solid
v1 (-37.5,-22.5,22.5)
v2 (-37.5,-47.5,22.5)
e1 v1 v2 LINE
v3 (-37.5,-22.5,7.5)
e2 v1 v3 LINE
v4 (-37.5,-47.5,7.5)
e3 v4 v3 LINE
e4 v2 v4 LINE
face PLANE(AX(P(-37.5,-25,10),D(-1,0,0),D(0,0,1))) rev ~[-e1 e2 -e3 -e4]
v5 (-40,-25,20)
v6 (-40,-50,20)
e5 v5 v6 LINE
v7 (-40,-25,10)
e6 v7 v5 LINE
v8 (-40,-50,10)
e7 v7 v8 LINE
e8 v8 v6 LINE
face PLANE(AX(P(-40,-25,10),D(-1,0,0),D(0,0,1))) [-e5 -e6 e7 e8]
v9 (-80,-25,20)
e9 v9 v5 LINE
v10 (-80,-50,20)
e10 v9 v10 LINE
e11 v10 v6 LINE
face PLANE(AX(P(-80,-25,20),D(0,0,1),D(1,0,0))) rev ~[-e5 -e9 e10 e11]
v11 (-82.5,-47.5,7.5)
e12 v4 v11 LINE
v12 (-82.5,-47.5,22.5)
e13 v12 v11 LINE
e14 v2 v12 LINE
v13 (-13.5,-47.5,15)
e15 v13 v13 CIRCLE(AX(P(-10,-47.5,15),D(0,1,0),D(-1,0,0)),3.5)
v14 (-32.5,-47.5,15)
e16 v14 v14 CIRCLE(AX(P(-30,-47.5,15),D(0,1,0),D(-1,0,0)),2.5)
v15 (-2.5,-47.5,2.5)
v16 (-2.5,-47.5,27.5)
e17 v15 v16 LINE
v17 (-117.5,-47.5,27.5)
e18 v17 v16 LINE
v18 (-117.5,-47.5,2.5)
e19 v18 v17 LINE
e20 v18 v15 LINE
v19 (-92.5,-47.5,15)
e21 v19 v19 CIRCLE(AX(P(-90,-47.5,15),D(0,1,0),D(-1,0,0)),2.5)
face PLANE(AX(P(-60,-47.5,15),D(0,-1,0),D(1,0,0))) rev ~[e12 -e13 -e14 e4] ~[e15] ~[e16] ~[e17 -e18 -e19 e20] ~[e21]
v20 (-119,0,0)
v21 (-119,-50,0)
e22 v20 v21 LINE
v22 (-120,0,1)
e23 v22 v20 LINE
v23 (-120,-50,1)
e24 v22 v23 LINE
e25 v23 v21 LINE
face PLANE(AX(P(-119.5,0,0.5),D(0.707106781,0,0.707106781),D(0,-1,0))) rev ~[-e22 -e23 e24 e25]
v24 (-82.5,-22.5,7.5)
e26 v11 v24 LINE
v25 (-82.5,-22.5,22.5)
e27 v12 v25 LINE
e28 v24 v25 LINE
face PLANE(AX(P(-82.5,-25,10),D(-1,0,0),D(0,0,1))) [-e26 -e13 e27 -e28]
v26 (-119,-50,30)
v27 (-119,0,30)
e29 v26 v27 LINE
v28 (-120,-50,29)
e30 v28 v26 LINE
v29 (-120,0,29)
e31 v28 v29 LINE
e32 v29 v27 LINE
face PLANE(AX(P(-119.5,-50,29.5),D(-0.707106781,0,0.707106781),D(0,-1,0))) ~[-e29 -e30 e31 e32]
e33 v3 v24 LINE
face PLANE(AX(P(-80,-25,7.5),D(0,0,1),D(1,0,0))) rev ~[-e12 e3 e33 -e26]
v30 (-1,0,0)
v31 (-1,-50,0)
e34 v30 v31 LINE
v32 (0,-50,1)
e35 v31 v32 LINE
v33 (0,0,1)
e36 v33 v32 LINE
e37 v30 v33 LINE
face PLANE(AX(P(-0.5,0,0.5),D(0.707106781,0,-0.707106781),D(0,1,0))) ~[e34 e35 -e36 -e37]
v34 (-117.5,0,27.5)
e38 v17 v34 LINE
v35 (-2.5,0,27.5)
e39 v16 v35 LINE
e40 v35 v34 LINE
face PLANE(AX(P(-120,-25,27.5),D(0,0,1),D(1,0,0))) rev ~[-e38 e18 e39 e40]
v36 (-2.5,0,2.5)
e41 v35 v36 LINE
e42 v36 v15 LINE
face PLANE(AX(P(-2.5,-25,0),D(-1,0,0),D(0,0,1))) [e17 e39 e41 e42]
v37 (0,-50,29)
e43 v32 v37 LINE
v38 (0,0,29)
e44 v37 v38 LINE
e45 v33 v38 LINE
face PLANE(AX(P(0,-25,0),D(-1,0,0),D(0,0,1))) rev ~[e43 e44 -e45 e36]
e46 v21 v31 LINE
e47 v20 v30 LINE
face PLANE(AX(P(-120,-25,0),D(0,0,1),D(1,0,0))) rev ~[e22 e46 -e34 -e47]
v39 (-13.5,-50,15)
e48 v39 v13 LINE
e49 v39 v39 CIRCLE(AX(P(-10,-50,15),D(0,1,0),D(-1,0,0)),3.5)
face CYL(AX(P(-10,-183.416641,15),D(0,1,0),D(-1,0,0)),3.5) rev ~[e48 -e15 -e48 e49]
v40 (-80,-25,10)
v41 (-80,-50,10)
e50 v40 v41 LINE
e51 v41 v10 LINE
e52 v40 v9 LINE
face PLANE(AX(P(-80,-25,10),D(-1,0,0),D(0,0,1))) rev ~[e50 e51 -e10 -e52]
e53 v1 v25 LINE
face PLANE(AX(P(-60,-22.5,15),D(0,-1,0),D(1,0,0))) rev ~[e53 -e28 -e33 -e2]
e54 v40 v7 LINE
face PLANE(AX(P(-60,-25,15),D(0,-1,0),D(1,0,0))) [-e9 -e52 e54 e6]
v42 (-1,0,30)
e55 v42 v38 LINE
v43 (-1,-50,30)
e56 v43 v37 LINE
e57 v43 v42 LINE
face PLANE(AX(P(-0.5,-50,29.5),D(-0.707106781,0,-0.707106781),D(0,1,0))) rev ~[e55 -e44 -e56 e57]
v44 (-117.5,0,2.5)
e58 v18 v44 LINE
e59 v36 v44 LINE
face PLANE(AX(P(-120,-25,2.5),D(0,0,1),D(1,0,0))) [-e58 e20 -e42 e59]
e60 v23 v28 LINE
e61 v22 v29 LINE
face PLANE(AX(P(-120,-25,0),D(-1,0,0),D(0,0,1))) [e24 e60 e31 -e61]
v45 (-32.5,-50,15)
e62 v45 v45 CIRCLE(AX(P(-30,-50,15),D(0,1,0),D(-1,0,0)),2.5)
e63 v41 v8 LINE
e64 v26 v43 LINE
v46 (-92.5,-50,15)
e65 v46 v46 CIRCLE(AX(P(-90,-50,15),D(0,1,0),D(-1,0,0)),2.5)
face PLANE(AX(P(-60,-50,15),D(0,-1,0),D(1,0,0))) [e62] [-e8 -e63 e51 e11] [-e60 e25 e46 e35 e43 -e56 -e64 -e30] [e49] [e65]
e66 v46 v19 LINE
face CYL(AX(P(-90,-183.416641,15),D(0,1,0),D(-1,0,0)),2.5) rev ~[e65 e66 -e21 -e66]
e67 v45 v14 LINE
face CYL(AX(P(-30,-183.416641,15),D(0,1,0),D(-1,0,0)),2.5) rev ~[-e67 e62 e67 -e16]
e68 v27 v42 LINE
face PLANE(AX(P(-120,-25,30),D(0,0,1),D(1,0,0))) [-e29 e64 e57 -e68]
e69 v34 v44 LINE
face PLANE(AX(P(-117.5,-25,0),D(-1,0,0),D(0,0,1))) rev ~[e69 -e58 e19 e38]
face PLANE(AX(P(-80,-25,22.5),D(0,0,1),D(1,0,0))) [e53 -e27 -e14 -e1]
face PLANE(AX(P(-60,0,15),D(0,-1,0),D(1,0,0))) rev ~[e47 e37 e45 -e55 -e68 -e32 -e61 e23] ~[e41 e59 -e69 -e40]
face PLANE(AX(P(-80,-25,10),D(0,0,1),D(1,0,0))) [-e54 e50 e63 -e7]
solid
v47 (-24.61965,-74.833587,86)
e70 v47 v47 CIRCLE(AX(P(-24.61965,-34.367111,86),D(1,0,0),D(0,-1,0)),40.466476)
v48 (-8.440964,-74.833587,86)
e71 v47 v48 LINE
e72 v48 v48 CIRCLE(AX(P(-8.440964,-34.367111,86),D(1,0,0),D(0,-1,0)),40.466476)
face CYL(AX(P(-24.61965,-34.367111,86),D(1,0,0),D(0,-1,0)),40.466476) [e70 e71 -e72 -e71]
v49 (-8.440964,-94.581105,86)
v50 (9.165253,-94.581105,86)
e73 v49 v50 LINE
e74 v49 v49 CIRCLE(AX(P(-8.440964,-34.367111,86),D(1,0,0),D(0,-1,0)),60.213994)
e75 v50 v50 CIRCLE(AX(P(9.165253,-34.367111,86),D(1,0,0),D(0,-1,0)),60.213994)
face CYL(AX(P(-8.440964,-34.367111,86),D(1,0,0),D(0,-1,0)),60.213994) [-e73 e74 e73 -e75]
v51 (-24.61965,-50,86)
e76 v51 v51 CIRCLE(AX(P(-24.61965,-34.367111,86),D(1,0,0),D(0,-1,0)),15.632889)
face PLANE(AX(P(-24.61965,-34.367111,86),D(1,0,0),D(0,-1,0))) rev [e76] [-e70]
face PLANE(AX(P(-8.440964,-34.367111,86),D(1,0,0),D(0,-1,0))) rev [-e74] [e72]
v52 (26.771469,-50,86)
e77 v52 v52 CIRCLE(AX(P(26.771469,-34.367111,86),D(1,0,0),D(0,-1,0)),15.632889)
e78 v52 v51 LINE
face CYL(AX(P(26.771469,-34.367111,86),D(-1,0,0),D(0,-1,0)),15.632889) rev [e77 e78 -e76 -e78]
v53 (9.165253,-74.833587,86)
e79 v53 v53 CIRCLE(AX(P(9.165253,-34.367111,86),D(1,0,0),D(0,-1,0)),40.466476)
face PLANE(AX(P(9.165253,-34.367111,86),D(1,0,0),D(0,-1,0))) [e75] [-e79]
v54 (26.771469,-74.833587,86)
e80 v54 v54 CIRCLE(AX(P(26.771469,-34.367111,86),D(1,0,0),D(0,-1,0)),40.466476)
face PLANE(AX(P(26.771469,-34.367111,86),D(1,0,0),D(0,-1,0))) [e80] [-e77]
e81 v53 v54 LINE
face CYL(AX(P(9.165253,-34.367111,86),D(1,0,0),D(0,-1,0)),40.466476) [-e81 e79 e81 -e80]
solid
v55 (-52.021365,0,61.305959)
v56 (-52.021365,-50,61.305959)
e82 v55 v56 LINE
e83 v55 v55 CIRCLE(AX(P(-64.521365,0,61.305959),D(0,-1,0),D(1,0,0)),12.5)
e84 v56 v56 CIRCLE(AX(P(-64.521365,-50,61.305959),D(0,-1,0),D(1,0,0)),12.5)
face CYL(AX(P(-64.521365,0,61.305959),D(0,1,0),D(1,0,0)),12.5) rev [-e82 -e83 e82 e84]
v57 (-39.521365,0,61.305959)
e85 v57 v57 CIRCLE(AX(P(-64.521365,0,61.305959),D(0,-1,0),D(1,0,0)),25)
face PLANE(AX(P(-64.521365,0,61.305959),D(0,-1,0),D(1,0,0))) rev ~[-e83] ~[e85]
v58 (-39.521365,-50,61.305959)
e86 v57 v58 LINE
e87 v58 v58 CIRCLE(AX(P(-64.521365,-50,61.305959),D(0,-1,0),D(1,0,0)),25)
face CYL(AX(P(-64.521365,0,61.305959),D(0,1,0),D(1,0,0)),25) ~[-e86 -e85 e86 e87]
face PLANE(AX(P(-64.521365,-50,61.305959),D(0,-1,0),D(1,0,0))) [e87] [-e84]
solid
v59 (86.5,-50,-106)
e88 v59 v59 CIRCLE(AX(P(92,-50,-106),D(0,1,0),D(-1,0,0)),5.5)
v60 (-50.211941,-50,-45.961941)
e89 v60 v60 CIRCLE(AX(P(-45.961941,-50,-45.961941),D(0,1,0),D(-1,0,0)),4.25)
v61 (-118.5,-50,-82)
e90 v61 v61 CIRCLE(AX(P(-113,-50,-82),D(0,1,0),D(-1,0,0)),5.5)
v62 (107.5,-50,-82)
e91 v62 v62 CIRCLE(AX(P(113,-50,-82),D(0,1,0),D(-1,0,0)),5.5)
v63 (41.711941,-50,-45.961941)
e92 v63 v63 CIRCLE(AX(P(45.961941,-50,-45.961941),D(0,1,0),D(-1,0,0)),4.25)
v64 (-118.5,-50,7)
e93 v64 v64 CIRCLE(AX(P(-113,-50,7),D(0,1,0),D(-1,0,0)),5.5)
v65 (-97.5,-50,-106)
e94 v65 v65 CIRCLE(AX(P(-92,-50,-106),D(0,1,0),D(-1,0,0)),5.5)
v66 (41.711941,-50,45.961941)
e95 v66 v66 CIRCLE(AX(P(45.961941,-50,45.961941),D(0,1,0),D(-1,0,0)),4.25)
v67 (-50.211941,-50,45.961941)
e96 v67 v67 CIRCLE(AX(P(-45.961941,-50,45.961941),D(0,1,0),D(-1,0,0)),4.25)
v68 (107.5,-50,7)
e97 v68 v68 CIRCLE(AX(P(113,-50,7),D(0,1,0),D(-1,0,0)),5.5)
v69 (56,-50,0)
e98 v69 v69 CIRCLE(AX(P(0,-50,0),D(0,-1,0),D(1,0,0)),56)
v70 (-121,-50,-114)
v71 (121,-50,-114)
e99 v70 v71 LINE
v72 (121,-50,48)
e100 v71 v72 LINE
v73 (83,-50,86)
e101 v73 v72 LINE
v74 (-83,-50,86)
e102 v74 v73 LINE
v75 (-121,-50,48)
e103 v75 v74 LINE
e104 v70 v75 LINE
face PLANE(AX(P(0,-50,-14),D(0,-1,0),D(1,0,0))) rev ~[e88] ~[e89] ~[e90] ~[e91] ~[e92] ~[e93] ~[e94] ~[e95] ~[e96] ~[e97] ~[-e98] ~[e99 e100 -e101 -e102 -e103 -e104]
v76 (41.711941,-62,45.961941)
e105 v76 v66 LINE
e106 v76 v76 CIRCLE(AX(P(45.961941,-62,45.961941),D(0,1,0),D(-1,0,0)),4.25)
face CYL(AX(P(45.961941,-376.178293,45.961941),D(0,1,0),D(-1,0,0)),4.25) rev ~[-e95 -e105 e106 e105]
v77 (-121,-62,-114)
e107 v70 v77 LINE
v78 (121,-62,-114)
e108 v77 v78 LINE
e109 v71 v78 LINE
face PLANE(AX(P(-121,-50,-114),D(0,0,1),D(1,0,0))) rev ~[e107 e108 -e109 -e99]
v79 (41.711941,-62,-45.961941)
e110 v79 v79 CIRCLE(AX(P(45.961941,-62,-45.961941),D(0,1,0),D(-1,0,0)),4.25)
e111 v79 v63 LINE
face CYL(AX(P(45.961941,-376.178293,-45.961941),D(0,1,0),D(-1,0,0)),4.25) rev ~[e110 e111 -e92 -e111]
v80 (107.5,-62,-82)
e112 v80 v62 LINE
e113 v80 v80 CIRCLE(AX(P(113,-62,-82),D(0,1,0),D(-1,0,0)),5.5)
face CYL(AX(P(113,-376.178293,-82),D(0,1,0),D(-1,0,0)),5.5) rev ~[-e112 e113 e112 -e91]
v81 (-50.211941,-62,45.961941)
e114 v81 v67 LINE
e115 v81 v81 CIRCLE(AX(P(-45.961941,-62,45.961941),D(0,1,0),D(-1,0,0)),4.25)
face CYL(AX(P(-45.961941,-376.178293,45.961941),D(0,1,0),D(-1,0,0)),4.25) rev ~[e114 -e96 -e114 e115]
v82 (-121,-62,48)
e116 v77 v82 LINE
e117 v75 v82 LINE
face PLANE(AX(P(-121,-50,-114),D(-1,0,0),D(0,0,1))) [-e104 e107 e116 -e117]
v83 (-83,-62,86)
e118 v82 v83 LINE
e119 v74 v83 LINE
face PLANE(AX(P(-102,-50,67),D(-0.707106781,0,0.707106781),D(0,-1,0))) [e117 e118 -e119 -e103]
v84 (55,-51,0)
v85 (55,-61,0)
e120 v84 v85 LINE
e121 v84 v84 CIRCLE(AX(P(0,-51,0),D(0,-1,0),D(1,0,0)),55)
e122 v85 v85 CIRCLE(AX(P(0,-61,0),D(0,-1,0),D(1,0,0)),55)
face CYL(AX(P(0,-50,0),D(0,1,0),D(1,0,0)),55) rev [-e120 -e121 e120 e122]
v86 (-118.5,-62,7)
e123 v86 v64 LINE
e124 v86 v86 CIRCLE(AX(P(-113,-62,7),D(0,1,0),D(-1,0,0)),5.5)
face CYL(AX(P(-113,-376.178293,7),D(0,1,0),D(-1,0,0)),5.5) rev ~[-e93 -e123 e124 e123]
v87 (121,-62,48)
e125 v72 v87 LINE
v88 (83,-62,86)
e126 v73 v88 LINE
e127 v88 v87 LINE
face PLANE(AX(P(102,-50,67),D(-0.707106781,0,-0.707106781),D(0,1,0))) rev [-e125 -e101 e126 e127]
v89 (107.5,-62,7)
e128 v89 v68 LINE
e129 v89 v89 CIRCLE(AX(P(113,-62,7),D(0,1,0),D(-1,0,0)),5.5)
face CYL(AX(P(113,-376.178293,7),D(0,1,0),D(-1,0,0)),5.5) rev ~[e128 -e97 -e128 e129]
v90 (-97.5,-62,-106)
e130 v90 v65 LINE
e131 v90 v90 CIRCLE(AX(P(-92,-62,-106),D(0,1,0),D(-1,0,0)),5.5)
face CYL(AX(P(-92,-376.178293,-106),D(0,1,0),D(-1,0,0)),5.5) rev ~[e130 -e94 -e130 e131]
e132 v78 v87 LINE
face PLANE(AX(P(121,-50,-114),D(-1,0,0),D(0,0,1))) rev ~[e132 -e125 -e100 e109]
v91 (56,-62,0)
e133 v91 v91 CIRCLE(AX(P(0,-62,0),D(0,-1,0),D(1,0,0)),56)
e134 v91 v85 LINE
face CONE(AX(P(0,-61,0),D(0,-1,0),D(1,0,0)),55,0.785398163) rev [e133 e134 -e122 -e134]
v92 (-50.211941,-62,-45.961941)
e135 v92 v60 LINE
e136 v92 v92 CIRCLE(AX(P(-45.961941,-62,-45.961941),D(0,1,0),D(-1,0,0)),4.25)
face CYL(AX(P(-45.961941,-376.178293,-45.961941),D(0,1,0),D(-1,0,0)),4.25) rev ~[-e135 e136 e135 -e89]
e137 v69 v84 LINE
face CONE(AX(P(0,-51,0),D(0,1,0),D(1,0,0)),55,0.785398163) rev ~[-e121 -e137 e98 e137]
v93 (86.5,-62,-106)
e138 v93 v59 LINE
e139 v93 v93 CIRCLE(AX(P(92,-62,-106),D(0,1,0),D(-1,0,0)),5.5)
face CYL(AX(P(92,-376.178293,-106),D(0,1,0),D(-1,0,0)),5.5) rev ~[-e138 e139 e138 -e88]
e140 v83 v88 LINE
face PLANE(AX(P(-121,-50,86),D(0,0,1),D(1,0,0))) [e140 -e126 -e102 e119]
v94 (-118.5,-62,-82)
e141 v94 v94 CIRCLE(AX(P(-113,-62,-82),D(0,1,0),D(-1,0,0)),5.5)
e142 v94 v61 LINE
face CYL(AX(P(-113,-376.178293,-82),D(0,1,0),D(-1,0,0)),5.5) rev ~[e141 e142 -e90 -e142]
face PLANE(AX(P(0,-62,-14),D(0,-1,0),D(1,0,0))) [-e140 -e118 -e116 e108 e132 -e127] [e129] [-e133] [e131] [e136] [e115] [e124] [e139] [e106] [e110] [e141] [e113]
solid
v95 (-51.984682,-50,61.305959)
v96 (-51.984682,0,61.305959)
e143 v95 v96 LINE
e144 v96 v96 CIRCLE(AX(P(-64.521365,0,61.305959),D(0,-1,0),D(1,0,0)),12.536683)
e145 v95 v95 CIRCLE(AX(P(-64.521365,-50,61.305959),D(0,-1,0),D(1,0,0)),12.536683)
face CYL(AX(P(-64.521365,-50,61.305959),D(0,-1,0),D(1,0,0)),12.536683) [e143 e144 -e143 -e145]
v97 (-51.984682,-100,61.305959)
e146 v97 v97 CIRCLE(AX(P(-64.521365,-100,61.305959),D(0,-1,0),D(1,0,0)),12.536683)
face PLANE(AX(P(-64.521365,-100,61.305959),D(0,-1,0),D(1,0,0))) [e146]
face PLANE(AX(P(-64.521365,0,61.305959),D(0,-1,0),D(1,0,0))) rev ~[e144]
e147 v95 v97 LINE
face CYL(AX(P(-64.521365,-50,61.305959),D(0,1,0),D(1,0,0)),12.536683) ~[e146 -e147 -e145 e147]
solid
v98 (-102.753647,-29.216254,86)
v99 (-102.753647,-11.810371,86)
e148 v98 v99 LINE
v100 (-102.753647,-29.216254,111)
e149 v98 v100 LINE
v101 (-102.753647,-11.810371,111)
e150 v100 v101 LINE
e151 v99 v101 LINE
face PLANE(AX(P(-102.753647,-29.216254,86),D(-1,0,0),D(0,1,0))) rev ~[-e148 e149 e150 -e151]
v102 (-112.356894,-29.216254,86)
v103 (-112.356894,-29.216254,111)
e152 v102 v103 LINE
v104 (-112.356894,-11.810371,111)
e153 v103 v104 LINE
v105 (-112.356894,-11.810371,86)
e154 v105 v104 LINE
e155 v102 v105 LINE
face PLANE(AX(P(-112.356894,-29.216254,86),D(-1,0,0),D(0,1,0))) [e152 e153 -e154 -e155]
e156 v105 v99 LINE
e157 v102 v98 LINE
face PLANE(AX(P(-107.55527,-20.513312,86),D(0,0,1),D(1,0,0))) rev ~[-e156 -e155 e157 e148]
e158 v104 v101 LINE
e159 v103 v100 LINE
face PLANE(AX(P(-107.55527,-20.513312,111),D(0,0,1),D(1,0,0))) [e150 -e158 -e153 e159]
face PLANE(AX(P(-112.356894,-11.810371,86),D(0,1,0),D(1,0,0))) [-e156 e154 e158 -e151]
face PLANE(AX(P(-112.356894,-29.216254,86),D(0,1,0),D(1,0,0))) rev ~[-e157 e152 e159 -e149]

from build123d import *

# Parameters (mm, degrees)
F0_W           = 120
F0_H           = 30
F1_DEPTH       = 25
F2_W           = 120
F2_H           = 30
F2_W_2         = 40
F2_H_2         = 10
F3_DEPTH       = 25
F4_T           = -2.5
F6_D           = 5
F7_D           = 7
F8_SIZE        = 1
F9_R           = 25
F9_R_2         = 12.5
F10_DEPTH      = 50
F13_R          = 12.5366828167
F14_DEPTH      = 50
F14_DEPTH_BACK = 50
F15_W          = 242
F15_H          = 200
F15_R          = 55
F16_DEPTH      = 12
F17_SIZE       = 38
F19_D          = 8.5
F21_D          = 11
F22_SIZE       = 1
F23_W          = 9.6032470465
F23_H          = 17.4058834091
F24_DEPTH      = 25


with BuildPart() as f1:
    # F0 (on Front) → F1 (new body)
    with BuildSketch(Plane.XZ):
        with Locations((-60, 15)):
            Rectangle(F0_W, F0_H)
    extrude(amount=F1_DEPTH)

    # F2 (on face) → F3 (join)
    with BuildSketch(Plane.XZ.offset(25)):
        with Locations((-60, 15)):
            Rectangle(F2_W, F2_H)
        with Locations((-60, 15)):
            Rectangle(F2_W_2, F2_H_2, mode=Mode.SUBTRACT)
    extrude(amount=F3_DEPTH)

    # F4
    f4_openings = [f1.faces().sort_by_distance(p)[0] for p in [
        (-60, 0, 15),
    ]]
    offset(amount=F4_T, openings=f4_openings, kind=Kind.INTERSECTION)

    # F6 (through all)
    with Locations(Plane.XZ.offset(50)):
        with Locations((-90, 15), (-30, 15)):
            Hole(F6_D / 2)

    # F7 (through all)
    with Locations(Plane.XZ.offset(50)):
        with Locations((-10, 15)):
            Hole(F7_D / 2)

    # F8
    f8_edges = [f1.edges().sort_by_distance(p)[0] for p in [
        (-120, -25, 30),
        (-120, -25, 0),
        (0, -25, 30),
        (0, -25, 0),
    ]]
    chamfer(f8_edges, length=F8_SIZE)


with BuildPart() as f10:
    # F9 (on Front) → F10 (new body)
    with BuildSketch(Plane.XZ):
        with Locations((-64.5213648677, 61.3059587777)):
            Circle(F9_R)
        with Locations((-64.5213648677, 61.3059587777)):
            Circle(F9_R_2, mode=Mode.SUBTRACT)
    extrude(amount=F10_DEPTH)


with BuildPart() as f14:
    # F13 (on offset) → F14 (new body, two sides)
    with BuildSketch(Plane.XZ.offset(50)) as f14_sk:
        with Locations((-64.5213648677, 61.3059587777)):
            Circle(F13_R)
    extrude(amount=-F14_DEPTH)
    extrude(f14_sk.sketch, amount=F14_DEPTH_BACK)


with BuildPart() as f16:
    # F15 (on offset) → F16 (new body)
    with BuildSketch(Plane.XZ.offset(50)):
        with Locations((0, -14)):
            Rectangle(F15_W, F15_H)
        Circle(F15_R, mode=Mode.SUBTRACT)
    extrude(amount=F16_DEPTH)

    # F17
    f17_edges = [f16.edges().sort_by_distance(p)[0] for p in [
        (-121, -56, 86),
        (121, -56, 86),
    ]]
    chamfer(f17_edges, length=F17_SIZE)

    # F19 (through all)
    with Locations(Plane.XZ.offset(62)):
        with Locations((-45.9619407771, 45.9619407771), (45.9619407771, 45.9619407771), (45.9619407771, -45.9619407771), (-45.9619407771, -45.9619407771)):
            Hole(F19_D / 2)

    # F21 (through all)
    with Locations(Plane.XZ.offset(62)):
        with Locations((-113, 7), (113, 7), (113, -82), (92, -106), (-92, -106), (-113, -82)):
            Hole(F21_D / 2)

    # F22
    f22_edges = [f16.edges().sort_by_distance(p)[0] for p in [
        (-55, -62, 0),
        (-55, -50, 0),
    ]]
    chamfer(f22_edges, length=F22_SIZE)


with BuildPart() as f24:
    # F23 (on face) → F24 (new body)
    with BuildSketch(Plane.XY.offset(86)):
        with Locations((-107.555270195, -20.5133124255)):
            Rectangle(F23_W, F23_H)
    extrude(amount=F24_DEPTH)


with BuildPart() as f26:
    # F25 (on face) → F26 (revolve)
    with BuildSketch(Plane.XY.offset(86)):
        Polygon((26.7714690417, -50), (-24.6196500957, -50), (-24.6196500957, -74.833586812), (-8.4409639239, -74.833586812), (-8.4409639239, -94.581104815), (9.1652534902, -94.581104815), (9.1652534902, -74.833586812), (26.7714690417, -74.833586812), align=None)
    revolve(axis=Axis((1.0507404804, -34.3671105802, 86), (1, 0, 0)))


solid = Compound([f1.part, f10.part, f14.part, f16.part, f24.part, f26.part])
